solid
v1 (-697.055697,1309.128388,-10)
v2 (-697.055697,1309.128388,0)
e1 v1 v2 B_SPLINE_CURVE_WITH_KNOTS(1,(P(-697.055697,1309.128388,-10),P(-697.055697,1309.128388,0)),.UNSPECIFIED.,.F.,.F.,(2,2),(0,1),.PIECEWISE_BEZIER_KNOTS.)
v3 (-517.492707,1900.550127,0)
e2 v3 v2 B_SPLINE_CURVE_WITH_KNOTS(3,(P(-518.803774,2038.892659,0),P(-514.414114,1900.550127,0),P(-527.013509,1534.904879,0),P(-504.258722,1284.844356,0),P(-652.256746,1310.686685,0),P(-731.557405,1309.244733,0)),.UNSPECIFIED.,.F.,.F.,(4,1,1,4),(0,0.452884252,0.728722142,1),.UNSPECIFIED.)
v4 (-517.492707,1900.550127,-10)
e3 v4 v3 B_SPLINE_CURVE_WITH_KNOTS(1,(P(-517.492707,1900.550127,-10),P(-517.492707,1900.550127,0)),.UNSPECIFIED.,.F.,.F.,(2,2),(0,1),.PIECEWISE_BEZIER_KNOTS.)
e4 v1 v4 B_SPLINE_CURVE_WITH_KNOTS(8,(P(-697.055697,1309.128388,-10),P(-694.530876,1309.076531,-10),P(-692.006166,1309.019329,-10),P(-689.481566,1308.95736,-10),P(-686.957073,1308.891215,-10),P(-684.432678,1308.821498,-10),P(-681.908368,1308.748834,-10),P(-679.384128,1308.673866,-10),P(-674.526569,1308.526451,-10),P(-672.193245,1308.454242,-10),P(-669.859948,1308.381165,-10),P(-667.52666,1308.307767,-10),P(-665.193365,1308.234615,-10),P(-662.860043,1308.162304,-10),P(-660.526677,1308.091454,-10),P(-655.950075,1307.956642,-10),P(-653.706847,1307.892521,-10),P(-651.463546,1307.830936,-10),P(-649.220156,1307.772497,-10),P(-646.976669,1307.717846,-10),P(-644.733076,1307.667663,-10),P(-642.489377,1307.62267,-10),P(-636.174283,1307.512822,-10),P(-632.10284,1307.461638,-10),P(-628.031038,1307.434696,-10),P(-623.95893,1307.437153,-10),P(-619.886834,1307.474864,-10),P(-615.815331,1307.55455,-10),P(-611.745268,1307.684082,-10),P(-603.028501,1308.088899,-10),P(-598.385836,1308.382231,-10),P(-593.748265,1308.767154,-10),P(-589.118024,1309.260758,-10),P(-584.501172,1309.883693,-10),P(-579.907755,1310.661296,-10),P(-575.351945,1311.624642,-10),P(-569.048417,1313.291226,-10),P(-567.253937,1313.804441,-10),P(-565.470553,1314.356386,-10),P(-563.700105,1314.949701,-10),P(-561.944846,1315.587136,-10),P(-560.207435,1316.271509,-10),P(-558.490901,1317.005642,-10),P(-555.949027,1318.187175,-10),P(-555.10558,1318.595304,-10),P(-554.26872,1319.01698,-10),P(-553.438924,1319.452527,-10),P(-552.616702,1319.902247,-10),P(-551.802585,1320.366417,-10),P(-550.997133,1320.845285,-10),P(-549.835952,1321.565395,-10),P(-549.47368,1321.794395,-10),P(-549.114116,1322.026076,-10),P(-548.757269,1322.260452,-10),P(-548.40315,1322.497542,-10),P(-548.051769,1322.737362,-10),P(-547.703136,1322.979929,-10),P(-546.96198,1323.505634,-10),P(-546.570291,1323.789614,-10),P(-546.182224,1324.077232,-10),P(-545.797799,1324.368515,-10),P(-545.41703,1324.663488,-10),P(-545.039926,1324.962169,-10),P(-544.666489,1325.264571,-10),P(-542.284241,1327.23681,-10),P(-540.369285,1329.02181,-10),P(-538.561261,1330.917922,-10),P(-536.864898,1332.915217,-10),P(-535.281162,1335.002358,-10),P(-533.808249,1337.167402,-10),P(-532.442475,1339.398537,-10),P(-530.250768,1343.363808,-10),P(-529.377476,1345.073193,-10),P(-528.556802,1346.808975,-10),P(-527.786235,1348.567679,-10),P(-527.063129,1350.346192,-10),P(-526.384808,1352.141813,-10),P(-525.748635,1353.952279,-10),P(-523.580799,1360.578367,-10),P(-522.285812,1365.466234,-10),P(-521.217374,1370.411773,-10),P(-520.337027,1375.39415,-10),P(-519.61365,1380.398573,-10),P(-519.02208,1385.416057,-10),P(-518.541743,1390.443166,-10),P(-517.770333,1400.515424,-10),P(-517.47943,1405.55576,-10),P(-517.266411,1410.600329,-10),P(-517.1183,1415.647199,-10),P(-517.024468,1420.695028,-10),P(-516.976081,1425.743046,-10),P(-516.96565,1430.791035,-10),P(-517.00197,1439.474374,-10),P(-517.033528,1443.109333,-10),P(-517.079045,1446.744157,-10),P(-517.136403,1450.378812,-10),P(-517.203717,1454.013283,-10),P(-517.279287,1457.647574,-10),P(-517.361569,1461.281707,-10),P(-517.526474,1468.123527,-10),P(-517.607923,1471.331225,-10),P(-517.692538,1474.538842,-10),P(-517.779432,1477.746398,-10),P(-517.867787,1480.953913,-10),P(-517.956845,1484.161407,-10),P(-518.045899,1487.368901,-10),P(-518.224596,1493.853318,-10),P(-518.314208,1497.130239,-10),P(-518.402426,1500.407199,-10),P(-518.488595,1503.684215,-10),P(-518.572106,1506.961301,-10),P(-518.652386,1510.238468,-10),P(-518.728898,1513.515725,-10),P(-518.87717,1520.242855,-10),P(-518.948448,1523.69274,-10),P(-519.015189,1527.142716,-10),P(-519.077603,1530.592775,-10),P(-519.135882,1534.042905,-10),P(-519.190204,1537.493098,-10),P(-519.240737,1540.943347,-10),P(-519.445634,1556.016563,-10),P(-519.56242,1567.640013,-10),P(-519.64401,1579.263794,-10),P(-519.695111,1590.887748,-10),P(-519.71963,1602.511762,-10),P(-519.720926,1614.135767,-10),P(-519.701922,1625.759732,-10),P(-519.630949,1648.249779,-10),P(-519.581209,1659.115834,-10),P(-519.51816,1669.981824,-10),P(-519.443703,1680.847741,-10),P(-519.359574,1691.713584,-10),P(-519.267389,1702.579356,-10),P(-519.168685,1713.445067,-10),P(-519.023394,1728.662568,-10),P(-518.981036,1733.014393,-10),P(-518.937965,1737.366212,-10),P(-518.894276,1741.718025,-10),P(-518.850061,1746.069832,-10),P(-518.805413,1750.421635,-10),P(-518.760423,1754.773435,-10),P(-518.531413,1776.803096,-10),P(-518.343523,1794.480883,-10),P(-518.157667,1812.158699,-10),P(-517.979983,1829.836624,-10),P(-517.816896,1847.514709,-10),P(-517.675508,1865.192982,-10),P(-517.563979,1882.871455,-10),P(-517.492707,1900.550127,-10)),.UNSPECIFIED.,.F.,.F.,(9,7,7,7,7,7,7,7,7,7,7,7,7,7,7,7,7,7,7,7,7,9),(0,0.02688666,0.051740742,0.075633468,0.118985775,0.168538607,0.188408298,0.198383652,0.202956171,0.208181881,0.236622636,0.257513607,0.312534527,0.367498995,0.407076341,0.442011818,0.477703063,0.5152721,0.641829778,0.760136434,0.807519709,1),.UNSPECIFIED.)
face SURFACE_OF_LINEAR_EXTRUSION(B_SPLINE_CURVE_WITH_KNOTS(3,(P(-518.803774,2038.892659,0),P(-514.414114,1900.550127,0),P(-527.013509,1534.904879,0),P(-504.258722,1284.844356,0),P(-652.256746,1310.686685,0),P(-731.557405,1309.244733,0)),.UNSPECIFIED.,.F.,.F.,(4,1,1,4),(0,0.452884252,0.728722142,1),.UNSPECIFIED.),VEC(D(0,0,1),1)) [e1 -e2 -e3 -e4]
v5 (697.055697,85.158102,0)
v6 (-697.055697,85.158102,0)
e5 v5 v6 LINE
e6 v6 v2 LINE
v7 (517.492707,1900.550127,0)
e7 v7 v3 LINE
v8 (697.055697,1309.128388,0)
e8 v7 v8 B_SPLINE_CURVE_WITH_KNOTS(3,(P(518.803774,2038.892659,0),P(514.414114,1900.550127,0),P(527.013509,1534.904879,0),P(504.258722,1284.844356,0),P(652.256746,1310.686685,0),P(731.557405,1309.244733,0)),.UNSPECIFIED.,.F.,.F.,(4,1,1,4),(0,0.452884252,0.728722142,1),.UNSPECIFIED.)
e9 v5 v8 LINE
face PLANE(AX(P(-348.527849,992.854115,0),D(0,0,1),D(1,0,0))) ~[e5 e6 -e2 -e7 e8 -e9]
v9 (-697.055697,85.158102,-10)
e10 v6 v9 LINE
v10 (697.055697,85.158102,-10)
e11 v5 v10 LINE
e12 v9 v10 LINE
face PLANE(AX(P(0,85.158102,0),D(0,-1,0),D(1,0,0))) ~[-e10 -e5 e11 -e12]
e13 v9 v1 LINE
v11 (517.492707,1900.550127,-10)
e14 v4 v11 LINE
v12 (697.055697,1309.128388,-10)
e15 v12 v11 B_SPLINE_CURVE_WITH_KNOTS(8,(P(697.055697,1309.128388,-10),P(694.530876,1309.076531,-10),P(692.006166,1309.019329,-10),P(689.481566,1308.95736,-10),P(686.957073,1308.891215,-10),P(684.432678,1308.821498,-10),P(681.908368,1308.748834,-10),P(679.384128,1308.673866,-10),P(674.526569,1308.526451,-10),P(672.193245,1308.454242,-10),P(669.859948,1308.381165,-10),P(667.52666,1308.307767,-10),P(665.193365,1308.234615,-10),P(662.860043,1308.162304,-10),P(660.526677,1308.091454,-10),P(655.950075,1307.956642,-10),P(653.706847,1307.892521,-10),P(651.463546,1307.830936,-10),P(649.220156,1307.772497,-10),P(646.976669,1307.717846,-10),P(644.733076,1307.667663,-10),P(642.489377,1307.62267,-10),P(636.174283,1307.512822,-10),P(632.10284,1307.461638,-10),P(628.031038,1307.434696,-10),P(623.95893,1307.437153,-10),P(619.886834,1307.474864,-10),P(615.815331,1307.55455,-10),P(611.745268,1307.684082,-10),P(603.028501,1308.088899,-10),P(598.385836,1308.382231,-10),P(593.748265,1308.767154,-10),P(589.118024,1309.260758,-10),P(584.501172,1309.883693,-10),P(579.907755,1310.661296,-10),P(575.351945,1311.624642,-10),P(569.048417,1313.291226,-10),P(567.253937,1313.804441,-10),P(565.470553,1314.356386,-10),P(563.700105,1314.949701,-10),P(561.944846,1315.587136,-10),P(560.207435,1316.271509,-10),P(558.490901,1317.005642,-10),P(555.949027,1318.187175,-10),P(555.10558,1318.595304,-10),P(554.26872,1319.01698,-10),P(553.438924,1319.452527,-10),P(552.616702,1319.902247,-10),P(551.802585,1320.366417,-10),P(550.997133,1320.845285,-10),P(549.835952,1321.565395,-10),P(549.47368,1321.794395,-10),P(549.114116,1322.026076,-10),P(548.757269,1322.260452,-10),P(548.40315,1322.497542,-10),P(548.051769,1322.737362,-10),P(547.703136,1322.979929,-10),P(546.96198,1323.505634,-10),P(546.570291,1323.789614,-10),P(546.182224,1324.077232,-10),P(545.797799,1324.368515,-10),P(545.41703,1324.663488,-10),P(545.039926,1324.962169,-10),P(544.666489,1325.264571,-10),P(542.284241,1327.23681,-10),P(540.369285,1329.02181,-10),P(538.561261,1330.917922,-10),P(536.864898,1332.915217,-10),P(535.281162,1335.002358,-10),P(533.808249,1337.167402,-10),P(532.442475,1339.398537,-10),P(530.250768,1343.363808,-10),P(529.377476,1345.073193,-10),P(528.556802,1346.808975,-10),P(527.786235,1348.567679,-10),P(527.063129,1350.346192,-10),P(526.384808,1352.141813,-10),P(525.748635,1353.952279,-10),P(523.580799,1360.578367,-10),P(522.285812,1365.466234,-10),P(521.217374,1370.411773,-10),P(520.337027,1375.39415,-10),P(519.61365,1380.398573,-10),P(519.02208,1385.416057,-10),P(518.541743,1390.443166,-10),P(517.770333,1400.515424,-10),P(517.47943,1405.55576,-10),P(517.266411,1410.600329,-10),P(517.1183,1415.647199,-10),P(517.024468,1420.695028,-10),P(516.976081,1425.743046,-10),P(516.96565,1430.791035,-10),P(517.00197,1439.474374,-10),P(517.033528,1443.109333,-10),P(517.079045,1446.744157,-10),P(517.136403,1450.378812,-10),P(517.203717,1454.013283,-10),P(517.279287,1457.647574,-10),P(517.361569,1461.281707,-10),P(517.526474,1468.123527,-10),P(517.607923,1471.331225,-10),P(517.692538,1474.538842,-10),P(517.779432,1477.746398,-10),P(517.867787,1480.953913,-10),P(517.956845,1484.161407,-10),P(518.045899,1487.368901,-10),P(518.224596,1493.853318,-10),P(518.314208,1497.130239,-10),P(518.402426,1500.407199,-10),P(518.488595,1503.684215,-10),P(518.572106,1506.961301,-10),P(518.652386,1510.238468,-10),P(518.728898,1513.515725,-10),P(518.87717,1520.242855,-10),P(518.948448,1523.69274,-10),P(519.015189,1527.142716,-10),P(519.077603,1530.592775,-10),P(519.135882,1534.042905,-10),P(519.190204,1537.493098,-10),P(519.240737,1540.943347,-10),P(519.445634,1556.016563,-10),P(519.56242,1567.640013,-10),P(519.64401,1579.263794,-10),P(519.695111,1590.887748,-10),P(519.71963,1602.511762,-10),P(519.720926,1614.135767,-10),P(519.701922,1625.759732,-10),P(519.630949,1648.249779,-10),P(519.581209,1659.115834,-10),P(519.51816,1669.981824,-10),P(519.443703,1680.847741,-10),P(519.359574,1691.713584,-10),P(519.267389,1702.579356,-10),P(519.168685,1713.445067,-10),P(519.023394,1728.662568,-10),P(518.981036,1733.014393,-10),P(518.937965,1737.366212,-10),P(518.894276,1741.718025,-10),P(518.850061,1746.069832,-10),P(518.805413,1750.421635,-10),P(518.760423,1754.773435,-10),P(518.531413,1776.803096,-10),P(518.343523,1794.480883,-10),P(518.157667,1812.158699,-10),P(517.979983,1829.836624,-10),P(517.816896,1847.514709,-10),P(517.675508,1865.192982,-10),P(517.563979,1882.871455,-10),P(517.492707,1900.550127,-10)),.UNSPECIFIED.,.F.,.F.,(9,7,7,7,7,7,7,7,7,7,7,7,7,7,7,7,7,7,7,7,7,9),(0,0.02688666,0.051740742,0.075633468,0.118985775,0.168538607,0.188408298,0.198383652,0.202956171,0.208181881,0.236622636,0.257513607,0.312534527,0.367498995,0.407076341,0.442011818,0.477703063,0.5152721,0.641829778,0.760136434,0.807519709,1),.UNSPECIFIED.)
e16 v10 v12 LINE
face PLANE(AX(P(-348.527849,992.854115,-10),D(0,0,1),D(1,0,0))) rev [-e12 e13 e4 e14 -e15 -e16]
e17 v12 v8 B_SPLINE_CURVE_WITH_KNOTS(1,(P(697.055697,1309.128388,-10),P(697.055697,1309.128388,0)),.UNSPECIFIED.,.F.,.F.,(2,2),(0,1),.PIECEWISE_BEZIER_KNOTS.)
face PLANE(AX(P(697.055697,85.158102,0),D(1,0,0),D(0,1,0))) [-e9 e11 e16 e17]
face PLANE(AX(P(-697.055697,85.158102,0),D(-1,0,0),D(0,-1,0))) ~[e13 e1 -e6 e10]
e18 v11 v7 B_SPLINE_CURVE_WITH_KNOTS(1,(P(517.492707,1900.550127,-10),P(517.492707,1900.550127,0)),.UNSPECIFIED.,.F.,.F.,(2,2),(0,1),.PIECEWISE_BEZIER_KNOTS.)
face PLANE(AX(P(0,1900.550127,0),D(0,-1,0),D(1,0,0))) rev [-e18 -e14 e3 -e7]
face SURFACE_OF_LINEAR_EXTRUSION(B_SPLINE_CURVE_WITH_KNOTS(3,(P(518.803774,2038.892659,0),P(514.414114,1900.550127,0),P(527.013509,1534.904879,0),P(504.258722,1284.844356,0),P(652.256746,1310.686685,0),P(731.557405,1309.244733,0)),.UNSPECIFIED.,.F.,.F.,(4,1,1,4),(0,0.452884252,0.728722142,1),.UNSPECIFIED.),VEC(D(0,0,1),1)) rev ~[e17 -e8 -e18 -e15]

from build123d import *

# Parameters (mm, degrees)
F0_W     = 697.0556974411
F0_H     = 1815.3920248151
F1_DEPTH = 10
F3_DEPTH = 660


with BuildPart() as f1:
    # F0 (on Top) → F1 (new body)
    with BuildSketch(Plane.XY):
        with Locations((348.5278487206, 992.8541146219)):
            Rectangle(F0_W, F0_H)
    extrude(amount=-F1_DEPTH)

    # F2 (on face) → F3 (cut)
    with BuildSketch(Plane.XY):
        with BuildLine():
            add(Edge.make_bspline(
                [(518.803774091, 2038.8926588478), (514.4141140373, 1900.5501270294), (527.0135085035, 1534.9048792953), (504.258722184, 1284.8443561216), (652.2567457375, 1310.686684836), (731.5574045275, 1309.2447331839)],
                knots=[0, 0, 0, 0, 0.4528842523, 0.7287221415, 1, 1, 1, 1], degree=3))
            Line((731.5574045275, 1309.2447331839), (731.5574045275, 2029.0073490817))
            Line((731.5574045275, 2029.0073490817), (518.803774091, 2038.8926588478))
        make_face()
    extrude(amount=-F3_DEPTH, mode=Mode.SUBTRACT)

    # F4: F1 across plane


with BuildPart() as f1_1:
    add(f1.part)
    add(f1.part.mirror(Plane.YZ))


solid = f1_1.part
